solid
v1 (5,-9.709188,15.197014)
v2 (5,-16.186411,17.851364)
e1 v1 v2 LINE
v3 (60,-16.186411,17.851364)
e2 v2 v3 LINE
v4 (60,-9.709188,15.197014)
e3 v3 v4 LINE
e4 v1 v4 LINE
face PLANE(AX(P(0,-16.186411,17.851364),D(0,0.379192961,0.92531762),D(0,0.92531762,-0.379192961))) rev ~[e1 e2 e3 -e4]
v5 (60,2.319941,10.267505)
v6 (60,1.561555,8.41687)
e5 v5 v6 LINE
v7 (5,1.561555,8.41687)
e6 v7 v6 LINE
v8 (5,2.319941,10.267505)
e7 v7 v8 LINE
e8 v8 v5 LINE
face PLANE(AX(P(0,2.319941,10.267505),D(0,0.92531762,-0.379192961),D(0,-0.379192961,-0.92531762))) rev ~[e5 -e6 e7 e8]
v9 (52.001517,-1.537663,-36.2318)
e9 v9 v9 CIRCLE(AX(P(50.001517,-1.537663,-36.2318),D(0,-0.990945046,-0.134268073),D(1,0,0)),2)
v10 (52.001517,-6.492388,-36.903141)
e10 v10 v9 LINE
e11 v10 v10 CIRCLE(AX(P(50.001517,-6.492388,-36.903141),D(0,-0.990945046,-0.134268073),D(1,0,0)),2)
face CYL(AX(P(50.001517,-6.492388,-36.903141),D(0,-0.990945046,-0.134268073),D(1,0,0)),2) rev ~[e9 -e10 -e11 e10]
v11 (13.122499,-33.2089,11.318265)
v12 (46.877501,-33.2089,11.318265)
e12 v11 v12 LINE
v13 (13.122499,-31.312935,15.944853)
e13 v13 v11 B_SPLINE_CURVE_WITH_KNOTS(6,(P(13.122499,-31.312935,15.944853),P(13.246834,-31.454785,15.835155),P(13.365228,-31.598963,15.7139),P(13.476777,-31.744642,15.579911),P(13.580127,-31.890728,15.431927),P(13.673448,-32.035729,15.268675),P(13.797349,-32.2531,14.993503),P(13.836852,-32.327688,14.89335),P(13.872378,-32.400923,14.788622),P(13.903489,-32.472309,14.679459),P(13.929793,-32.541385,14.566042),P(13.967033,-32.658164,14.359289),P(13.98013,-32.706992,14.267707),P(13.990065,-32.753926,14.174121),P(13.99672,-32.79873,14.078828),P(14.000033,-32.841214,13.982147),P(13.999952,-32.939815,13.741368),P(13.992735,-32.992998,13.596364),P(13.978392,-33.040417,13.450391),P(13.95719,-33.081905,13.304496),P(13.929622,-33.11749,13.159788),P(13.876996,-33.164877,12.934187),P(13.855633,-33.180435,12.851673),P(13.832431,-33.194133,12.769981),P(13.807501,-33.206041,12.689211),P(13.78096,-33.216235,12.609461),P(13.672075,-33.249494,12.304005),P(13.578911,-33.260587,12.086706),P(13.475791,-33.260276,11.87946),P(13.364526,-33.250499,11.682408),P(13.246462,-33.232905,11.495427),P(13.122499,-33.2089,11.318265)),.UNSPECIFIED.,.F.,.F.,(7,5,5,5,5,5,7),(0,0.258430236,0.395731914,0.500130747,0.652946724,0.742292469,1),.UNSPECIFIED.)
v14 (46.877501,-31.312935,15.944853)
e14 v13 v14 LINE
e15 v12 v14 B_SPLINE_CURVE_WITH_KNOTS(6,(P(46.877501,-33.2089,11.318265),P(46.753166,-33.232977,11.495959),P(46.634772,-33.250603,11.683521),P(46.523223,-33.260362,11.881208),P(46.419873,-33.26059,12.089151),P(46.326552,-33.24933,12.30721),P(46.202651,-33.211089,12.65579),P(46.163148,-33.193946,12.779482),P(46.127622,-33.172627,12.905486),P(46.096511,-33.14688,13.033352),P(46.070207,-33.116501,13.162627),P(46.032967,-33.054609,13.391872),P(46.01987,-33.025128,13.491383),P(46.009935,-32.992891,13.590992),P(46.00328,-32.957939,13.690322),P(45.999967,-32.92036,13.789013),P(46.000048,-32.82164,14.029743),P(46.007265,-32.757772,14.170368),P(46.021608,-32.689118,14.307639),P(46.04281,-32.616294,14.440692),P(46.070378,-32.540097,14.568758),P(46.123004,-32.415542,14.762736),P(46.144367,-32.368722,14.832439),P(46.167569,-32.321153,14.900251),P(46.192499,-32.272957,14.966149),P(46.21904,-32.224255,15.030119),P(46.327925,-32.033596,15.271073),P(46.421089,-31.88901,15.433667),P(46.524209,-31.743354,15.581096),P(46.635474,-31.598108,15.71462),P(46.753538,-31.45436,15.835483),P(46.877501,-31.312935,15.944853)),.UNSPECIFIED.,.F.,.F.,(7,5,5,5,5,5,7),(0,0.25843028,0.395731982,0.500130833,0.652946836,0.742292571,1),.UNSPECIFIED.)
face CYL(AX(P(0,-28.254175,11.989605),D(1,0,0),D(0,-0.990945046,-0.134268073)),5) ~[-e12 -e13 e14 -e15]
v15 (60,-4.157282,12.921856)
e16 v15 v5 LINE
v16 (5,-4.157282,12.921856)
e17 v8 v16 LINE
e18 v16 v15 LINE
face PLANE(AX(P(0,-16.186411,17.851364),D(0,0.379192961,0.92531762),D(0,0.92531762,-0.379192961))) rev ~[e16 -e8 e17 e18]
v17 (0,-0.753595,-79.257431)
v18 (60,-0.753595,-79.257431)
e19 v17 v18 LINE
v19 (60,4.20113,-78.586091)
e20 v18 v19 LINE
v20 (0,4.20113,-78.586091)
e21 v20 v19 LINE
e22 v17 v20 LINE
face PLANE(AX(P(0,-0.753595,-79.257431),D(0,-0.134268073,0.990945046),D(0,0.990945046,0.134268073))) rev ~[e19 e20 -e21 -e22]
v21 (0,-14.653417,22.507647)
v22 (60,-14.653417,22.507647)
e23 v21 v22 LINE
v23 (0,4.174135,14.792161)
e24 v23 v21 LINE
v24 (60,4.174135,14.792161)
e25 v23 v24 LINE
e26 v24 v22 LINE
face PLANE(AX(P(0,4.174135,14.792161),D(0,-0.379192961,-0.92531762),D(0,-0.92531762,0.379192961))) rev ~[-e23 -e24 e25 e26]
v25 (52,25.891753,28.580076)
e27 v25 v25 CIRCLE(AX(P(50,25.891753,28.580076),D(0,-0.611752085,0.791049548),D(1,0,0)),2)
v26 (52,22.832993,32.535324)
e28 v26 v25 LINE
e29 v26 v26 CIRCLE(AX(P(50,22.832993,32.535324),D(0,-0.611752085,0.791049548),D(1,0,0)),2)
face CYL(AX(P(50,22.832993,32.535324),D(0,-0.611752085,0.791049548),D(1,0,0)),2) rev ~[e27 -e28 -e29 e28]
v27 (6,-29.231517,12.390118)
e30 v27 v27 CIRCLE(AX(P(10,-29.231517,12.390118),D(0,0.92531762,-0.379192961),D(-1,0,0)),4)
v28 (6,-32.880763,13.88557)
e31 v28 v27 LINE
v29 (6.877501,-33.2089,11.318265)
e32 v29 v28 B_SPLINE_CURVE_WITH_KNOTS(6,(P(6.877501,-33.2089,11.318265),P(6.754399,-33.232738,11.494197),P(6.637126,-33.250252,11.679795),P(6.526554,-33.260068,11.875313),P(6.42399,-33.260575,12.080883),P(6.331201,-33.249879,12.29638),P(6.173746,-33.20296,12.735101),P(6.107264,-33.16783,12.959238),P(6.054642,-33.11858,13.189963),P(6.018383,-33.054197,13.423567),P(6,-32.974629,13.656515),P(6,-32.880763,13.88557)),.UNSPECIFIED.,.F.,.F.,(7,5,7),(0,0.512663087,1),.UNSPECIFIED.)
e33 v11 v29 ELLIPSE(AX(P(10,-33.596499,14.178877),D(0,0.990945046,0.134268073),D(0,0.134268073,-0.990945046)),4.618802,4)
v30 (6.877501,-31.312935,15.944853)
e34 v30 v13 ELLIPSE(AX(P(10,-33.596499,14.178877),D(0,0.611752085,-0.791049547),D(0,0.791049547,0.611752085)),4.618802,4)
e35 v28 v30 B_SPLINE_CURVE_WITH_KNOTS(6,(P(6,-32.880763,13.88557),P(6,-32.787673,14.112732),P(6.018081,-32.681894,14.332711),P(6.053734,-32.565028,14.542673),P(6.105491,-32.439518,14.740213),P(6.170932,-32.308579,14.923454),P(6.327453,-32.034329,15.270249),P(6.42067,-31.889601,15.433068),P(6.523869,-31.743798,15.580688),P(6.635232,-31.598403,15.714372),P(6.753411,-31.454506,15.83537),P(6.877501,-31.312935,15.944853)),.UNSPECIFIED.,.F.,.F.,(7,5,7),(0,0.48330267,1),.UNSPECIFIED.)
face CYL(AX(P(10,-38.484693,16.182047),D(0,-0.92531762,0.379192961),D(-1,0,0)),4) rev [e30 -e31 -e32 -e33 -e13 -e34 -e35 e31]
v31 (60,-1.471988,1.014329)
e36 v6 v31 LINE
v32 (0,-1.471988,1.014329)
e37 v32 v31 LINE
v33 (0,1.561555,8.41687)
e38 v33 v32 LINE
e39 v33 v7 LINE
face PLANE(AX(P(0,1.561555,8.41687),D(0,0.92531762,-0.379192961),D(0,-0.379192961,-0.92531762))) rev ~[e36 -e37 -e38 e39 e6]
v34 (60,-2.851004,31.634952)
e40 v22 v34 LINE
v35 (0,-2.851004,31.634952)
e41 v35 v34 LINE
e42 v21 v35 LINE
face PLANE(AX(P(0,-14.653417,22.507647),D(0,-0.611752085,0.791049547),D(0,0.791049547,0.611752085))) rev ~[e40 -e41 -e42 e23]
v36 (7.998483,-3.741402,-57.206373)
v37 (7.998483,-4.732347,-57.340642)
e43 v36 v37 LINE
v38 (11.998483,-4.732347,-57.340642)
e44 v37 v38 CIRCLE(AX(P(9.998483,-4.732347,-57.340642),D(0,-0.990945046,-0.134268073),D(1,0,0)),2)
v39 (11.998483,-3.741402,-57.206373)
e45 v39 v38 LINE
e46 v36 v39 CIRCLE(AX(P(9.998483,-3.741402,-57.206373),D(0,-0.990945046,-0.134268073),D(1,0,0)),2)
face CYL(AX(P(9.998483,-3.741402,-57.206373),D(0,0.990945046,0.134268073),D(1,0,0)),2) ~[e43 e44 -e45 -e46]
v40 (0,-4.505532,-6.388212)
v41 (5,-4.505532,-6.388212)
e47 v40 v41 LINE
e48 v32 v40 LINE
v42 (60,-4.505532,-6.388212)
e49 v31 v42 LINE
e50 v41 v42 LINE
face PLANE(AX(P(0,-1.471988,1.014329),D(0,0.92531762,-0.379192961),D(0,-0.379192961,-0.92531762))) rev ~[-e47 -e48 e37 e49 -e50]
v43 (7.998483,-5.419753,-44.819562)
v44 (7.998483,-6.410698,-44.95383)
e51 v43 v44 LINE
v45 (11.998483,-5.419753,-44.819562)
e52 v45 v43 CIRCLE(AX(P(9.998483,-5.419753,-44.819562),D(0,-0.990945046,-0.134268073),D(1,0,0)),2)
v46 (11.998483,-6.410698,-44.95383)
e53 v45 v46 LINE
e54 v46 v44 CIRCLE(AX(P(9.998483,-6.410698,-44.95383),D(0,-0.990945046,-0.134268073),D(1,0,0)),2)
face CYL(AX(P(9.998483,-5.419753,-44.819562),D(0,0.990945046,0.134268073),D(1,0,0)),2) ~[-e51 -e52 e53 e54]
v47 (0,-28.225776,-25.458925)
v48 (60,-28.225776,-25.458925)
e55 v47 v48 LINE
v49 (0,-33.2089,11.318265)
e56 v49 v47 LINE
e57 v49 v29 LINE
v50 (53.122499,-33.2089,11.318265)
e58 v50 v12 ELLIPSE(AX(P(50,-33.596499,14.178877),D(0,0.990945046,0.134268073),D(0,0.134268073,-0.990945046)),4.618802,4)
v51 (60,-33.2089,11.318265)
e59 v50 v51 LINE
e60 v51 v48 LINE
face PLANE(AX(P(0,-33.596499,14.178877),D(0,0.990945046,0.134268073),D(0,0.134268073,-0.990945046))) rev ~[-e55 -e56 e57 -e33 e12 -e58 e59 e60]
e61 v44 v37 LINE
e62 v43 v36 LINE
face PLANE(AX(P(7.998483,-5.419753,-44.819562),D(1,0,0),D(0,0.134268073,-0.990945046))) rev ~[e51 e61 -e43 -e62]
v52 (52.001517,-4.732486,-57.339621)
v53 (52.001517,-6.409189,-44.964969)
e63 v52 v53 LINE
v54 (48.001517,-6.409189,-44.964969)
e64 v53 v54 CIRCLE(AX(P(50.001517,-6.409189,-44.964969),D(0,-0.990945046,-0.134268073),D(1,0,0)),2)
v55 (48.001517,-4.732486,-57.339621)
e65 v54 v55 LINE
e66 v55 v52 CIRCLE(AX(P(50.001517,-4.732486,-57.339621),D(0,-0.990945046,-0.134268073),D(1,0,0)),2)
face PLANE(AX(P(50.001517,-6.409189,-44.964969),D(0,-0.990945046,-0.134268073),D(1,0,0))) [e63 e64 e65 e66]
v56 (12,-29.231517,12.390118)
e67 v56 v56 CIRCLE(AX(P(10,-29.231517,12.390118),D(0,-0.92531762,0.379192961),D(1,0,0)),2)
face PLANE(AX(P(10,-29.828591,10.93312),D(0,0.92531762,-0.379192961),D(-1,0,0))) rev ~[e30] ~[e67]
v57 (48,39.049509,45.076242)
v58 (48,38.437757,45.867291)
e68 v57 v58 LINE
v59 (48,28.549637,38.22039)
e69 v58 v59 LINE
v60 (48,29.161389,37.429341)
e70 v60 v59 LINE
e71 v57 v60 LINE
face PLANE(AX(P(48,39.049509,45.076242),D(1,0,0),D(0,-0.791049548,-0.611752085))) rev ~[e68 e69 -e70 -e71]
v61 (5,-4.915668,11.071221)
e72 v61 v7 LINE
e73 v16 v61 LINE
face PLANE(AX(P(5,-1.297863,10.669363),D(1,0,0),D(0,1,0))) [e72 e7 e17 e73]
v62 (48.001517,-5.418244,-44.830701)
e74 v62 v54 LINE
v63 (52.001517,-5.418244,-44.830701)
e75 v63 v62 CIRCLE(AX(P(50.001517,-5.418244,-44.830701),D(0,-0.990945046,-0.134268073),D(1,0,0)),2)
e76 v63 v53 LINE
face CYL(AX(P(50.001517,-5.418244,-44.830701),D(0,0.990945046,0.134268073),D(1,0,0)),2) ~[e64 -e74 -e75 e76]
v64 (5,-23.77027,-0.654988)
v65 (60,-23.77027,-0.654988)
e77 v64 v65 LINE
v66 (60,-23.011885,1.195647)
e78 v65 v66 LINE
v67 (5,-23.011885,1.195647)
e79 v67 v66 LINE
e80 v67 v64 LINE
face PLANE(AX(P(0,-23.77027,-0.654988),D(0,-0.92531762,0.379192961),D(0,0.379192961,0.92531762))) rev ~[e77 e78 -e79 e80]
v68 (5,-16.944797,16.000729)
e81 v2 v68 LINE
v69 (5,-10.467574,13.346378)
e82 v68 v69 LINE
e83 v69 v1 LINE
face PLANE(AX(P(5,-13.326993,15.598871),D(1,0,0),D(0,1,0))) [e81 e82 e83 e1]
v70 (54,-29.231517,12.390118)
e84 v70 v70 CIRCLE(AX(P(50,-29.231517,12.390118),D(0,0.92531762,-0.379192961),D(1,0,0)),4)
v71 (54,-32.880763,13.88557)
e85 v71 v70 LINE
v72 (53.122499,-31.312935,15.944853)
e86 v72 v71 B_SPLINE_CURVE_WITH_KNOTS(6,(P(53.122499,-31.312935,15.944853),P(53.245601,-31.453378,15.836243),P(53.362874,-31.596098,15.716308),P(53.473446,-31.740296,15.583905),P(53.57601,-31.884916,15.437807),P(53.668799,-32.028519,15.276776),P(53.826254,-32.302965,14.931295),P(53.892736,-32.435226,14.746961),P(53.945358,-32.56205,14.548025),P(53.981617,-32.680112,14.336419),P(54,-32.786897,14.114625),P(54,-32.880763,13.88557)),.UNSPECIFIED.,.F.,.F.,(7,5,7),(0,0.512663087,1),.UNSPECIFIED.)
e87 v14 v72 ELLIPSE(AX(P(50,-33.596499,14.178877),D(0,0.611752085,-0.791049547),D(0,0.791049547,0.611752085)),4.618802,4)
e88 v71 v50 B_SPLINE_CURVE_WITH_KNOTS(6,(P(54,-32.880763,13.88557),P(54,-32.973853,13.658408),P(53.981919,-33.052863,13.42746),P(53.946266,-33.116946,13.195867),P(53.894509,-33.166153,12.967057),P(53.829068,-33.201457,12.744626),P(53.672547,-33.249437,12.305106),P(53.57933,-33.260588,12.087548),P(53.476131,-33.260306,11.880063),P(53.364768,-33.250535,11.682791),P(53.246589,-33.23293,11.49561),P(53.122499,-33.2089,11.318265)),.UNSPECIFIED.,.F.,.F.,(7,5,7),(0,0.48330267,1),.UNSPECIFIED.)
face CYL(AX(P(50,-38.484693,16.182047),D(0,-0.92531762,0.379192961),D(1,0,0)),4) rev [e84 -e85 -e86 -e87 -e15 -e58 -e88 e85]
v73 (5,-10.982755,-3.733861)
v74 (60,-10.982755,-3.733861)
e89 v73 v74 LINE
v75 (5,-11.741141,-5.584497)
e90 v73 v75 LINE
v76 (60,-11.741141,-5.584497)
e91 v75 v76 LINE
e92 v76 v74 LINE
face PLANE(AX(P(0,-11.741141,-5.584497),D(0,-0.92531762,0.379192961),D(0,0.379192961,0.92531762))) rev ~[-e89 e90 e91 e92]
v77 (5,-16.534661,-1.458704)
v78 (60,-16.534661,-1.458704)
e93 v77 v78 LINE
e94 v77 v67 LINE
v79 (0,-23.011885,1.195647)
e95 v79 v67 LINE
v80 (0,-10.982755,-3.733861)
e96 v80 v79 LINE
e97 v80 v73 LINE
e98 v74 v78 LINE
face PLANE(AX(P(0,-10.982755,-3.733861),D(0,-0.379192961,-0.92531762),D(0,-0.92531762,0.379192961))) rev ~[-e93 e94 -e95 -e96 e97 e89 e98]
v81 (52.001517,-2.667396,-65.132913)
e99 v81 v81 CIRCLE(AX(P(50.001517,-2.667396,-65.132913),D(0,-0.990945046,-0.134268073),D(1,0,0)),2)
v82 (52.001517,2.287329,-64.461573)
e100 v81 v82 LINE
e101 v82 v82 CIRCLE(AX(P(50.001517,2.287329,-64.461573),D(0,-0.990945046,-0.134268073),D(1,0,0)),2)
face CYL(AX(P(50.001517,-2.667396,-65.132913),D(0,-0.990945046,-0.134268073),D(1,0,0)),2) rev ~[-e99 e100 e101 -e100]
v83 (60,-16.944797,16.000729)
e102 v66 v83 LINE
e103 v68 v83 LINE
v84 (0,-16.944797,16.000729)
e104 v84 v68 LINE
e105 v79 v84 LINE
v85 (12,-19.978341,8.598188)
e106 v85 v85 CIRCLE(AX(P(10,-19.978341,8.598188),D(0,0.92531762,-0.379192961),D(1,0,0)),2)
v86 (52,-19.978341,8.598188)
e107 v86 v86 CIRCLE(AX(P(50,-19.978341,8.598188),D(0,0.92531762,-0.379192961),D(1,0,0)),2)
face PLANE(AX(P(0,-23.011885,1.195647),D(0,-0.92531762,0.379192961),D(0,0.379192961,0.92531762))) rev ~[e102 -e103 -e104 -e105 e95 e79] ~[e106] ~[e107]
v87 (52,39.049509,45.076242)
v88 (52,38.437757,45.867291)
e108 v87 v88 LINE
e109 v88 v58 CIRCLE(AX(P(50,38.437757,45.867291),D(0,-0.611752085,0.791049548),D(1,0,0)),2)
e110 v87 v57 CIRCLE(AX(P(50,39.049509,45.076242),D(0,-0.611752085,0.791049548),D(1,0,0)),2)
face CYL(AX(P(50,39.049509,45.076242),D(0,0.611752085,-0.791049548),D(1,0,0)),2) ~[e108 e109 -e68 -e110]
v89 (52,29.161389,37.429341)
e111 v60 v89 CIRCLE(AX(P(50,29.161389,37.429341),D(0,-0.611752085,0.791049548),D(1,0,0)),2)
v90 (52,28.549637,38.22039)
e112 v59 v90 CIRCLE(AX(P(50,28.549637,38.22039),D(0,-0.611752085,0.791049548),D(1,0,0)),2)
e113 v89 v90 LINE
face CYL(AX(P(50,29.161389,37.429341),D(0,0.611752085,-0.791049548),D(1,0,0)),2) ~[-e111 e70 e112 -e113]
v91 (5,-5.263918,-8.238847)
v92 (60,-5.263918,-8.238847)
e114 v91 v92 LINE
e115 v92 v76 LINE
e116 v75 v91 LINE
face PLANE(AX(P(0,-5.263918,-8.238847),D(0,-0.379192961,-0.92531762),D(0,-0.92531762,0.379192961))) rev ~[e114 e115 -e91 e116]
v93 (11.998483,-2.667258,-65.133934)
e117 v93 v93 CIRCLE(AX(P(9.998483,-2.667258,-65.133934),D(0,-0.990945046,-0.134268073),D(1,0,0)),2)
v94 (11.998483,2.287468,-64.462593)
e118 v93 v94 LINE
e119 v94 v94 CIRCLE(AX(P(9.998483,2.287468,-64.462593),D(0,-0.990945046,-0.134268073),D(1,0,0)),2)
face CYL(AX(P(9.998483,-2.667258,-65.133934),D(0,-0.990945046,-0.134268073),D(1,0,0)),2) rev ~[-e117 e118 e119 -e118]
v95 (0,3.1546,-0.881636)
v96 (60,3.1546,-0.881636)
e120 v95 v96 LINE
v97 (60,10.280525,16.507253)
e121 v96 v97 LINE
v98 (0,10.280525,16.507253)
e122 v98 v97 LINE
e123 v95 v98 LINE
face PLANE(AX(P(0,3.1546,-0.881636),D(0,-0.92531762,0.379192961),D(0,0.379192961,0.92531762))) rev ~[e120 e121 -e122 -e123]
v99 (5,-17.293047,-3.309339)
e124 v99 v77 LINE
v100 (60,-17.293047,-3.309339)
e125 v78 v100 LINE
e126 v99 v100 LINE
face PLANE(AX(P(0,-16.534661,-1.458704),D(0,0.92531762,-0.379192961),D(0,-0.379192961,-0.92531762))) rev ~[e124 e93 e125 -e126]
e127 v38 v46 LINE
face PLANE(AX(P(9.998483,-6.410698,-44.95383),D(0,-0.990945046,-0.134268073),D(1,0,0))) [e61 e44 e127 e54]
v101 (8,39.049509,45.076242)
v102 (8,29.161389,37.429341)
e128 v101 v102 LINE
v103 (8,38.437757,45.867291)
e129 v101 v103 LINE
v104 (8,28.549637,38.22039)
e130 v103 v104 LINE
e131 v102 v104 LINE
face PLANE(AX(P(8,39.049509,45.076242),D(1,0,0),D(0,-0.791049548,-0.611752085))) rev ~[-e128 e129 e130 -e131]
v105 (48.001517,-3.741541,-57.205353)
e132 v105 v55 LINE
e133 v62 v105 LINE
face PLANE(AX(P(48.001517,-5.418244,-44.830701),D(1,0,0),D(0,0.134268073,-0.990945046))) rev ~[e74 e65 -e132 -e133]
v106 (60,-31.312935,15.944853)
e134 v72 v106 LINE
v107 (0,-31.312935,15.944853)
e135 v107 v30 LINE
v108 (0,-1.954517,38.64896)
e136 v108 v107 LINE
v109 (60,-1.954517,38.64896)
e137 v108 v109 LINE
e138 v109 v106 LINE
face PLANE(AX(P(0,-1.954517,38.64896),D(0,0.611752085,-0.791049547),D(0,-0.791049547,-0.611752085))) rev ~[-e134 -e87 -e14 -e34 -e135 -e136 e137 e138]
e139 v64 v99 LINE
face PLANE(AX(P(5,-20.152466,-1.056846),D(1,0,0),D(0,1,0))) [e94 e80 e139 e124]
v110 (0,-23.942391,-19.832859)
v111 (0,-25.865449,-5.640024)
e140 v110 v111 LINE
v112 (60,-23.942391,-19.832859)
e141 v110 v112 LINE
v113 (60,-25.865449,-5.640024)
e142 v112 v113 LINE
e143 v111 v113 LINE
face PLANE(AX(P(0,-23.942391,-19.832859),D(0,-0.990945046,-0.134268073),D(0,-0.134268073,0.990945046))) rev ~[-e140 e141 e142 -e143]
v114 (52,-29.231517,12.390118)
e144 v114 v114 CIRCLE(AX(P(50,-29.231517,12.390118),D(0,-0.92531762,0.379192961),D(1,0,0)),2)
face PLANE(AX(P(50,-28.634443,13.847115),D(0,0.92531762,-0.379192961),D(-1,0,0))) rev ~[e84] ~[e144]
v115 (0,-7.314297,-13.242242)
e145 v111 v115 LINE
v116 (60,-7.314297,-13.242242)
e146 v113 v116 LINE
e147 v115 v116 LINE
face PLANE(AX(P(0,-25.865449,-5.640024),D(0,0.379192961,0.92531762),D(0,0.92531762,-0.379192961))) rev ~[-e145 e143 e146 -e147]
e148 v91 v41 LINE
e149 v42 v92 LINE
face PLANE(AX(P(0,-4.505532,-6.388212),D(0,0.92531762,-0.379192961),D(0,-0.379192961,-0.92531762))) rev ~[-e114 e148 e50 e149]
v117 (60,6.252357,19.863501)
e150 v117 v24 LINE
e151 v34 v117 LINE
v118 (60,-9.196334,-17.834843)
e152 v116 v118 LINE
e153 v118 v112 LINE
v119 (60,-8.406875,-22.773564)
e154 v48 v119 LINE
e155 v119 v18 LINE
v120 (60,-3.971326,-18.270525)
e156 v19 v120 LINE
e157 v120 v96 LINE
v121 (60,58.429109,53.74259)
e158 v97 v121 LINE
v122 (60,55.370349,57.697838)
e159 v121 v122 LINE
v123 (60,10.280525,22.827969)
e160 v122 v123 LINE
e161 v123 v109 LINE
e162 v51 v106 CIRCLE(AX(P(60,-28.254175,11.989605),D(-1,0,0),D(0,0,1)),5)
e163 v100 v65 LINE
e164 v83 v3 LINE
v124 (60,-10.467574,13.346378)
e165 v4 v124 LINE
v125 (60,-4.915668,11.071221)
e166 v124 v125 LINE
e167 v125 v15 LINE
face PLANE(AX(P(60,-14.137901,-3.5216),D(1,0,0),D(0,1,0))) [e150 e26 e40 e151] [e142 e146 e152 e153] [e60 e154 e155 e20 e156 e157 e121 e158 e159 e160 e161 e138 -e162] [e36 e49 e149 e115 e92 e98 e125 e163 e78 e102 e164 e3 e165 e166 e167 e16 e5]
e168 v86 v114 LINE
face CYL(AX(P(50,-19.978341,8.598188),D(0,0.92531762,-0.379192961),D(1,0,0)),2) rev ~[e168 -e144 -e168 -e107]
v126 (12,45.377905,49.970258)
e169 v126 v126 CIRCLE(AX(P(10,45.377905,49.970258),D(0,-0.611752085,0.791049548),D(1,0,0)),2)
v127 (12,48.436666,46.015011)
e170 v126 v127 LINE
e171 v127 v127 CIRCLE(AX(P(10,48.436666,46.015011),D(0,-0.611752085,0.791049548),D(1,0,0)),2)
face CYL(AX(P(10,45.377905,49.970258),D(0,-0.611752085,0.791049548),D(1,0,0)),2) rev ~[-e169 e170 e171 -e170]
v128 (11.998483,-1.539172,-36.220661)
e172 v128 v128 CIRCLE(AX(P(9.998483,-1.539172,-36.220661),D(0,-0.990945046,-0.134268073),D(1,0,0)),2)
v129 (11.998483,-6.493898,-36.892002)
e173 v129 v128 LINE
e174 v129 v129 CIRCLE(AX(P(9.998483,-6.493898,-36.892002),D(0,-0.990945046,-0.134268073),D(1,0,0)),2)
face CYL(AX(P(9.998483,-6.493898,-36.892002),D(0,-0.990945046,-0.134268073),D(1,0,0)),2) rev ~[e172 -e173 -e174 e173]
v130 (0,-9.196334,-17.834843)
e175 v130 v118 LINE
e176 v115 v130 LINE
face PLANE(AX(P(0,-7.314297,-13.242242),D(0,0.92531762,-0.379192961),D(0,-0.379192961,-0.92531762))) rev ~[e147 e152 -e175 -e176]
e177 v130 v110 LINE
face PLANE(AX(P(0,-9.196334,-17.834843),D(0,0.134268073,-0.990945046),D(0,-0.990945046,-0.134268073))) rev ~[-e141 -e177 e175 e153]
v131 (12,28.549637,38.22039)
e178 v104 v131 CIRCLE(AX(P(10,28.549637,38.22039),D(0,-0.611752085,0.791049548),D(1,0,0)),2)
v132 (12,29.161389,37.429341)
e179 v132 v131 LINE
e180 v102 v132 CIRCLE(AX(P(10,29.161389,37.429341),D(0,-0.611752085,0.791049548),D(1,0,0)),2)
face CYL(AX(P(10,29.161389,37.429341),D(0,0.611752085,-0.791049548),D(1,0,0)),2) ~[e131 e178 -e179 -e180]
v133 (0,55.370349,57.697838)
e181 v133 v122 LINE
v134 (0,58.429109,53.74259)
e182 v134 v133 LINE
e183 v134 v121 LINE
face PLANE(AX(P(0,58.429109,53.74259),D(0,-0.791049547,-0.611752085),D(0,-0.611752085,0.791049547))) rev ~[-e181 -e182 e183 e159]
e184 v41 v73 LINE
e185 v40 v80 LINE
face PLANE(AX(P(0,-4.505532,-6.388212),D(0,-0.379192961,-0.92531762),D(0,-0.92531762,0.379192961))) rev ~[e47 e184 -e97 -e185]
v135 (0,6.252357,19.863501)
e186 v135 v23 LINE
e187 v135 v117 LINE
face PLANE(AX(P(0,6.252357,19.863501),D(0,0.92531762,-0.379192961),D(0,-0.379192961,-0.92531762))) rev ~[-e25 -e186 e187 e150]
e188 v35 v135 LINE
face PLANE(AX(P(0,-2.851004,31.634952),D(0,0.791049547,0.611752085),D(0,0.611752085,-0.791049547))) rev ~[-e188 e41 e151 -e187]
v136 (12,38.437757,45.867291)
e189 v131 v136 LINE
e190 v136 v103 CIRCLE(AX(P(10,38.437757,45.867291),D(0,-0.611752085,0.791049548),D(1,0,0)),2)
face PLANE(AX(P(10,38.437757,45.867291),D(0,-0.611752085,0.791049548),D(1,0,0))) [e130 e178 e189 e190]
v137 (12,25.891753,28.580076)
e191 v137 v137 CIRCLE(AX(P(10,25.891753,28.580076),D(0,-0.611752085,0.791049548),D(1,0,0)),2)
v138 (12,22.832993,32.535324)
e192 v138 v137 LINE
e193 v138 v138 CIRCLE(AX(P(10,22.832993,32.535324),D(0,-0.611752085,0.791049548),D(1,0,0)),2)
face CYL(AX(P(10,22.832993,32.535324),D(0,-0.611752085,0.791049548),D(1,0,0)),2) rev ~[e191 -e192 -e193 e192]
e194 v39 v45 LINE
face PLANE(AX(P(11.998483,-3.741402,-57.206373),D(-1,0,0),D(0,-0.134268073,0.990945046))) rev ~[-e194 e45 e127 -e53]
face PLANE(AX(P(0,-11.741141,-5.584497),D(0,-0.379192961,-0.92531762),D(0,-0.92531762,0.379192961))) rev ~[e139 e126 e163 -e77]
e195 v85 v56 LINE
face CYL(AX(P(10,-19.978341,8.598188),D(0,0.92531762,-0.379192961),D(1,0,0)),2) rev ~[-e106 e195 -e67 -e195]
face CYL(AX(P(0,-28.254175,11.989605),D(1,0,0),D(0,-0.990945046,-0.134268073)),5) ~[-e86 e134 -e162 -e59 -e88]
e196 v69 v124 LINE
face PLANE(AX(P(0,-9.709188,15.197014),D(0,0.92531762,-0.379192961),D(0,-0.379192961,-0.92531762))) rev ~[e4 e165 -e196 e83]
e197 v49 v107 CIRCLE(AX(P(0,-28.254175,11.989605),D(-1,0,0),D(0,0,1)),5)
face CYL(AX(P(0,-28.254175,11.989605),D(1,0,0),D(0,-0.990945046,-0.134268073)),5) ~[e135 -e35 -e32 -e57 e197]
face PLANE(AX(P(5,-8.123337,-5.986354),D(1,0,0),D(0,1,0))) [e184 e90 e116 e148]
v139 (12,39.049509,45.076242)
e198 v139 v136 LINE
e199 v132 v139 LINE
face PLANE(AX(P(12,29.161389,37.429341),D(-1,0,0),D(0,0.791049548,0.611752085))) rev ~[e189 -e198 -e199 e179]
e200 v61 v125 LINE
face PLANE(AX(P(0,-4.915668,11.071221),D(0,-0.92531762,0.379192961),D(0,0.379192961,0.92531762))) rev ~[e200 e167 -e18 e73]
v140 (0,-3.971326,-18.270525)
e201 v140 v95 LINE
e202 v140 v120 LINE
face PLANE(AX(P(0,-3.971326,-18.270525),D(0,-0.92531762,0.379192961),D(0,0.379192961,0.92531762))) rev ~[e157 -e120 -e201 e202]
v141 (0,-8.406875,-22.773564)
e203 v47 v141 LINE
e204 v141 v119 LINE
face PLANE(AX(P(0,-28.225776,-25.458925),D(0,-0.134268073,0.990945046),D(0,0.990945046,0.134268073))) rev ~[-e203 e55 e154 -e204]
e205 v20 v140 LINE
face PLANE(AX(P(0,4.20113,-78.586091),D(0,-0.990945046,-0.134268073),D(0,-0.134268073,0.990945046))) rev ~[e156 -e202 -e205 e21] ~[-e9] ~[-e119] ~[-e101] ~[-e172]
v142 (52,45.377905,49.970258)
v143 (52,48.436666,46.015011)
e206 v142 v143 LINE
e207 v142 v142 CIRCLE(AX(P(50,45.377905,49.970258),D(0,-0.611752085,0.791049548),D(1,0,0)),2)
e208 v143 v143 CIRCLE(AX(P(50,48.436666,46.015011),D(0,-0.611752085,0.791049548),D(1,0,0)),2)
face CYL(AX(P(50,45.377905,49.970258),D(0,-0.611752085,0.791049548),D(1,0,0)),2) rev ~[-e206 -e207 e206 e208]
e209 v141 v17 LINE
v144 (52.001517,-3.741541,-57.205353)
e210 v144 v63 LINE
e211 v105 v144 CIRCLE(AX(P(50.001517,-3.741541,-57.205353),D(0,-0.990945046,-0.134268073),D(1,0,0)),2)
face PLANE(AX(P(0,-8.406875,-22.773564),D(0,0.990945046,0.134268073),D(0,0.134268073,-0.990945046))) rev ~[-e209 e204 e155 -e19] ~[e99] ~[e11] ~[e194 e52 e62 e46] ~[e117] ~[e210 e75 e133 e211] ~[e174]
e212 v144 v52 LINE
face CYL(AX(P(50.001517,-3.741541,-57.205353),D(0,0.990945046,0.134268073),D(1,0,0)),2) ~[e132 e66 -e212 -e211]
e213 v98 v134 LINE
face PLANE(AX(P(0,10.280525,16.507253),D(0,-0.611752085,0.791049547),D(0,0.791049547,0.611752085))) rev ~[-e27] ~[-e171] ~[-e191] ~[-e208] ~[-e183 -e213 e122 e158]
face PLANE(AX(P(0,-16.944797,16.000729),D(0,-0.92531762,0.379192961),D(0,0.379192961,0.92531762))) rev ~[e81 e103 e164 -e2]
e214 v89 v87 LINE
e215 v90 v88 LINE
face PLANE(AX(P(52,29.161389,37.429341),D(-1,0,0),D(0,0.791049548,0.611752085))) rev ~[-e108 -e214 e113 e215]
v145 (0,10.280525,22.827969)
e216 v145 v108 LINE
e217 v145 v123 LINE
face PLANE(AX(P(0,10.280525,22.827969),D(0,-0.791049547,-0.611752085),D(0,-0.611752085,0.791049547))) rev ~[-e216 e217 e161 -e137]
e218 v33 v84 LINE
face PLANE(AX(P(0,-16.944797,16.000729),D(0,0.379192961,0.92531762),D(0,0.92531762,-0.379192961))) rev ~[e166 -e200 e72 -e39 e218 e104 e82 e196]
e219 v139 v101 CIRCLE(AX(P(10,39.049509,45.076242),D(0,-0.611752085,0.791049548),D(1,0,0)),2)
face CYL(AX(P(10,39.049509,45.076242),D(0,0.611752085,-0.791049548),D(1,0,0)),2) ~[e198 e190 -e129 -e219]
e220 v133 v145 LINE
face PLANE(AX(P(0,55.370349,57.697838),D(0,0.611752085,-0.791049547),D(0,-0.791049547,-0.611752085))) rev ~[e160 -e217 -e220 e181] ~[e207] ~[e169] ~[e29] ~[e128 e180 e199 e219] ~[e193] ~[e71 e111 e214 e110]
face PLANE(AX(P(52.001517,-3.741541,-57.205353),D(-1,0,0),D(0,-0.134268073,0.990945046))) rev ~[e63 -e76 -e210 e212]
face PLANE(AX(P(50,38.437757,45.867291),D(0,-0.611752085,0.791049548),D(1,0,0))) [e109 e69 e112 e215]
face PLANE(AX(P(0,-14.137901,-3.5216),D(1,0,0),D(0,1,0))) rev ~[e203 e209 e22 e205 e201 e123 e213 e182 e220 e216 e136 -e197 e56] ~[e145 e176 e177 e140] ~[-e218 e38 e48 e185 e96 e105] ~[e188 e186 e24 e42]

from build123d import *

# Parameters (mm, degrees)
F1_DEPTH  = 60
F2_DEPTH  = 5
F3_DEPTH  = 60
F4_R      = 5
F7_DEPTH  = 5
F8_DEPTH  = 5
F9_DEPTH  = 1
F10_DEPTH = 1
F12_DEPTH = 25
F13_DEPTH = 20
F14_DEPTH = 10


with BuildPart() as f1:
    # F0 (on Right) → F1 (new body)
    with BuildSketch(Plane.YZ):
        Polygon((-1.9545168432, 38.6489601963), (-33.5964987424, 14.1788767986), (-28.2257758369, -25.4589250511), (-8.406874912, -22.7735635983), (-0.7535947717, -79.2574312341), (4.2011304595, -78.5860908709), (-3.9713255886, -18.2705245759), (3.1545996335, -0.8816359607), (10.2805248557, 16.5072526545), (58.4291094867, 53.742590351), (55.370349062, 57.6978380884), (10.2805248557, 22.8279692467), align=None)
        Polygon((-25.8654488138, -5.6400241263), (-7.3142972833, -13.2422419285), (-9.1963342424, -17.8348428934), (-23.9423909688, -19.8328594567), align=None, mode=Mode.SUBTRACT)
        Polygon((1.5615552233, 8.4168698067), (-1.4719884671, 1.0143288458), (-4.5055321574, -6.3882121151), (-5.26391808, -8.2388473554), (-11.7411414209, -5.5844966263), (-17.2930471416, -3.3093388585), (-23.7702704824, -0.6549881294), (-23.0118845598, 1.1956471108), (-16.944797179, 16.0007290327), (-16.1864112564, 17.851364273), (-9.7091879156, 15.1970135439), (-4.1572821949, 12.9218557761), (2.3199411459, 10.267505047), align=None, mode=Mode.SUBTRACT)
        Polygon((-14.6534166938, 22.50764705), (-2.8510041559, 31.6349520341), (6.2523573083, 19.863500585), (4.1741345282, 14.7921613112), align=None, mode=Mode.SUBTRACT)
    extrude(amount=F1_DEPTH)

    # F0 (on Right) → F2 (join)
    with BuildSketch(Plane.YZ):
        Polygon((-16.944797179, 16.0007290327), (-10.4675738382, 13.3463783036), (-9.7091879156, 15.1970135439), (-16.1864112564, 17.851364273), align=None)
        Polygon((-4.9156681175, 11.0712205358), (1.5615552233, 8.4168698067), (2.3199411459, 10.267505047), (-4.1572821949, 12.9218557761), align=None)
        Polygon((-5.26391808, -8.2388473554), (-4.5055321574, -6.3882121151), (-10.9827554983, -3.7338613861), (-11.7411414209, -5.5844966263), align=None)
        Polygon((-17.2930471416, -3.3093388585), (-16.534661219, -1.4587036183), (-23.0118845598, 1.1956471108), (-23.7702704824, -0.6549881294), align=None)
    extrude(amount=F2_DEPTH)

    # F0 (on Right) → F3 (join)
    with BuildSketch(Plane.YZ):
        Polygon((-11.7411414209, -5.5844966263), (-10.9827554983, -3.7338613861), (-16.534661219, -1.4587036183), (-17.2930471416, -3.3093388585), align=None)
        Polygon((-10.4675738382, 13.3463783036), (-4.9156681175, 11.0712205358), (-4.1572821949, 12.9218557761), (-9.7091879156, 15.1970135439), align=None)
    extrude(amount=F3_DEPTH)

    # F4
    f4_edges = [f1.edges().sort_by_distance(p)[0] for p in [
        (30, -33.596499, 14.178877),
    ]]
    fillet(f4_edges, radius=F4_R)

    # F6 (on face) → F7 (cut)
    with BuildSketch(Plane(origin=(0, -11.2853910764, -1.5291137632), x_dir=(1, 0, 0), z_dir=(0, -0.9909450462, -0.1342680726))):
        with BuildLine():
            ThreePointArc((7.9984828914, -64.1860215089), (9.9984828914, -66.1860215089), (11.9984828914, -64.1860215089))
            ThreePointArc((11.9984828914, -64.1860215089), (9.9984828914, -62.1860215089), (7.9984828914, -64.1860215089))
        make_face()
        with BuildLine():
            ThreePointArc((7.9984828914, -35.6860233554), (9.9984828914, -37.6860233554), (11.9984828914, -35.6860233554))
            ThreePointArc((11.9984828914, -35.6860233554), (9.9984828914, -33.6860233554), (7.9984828914, -35.6860233554))
        make_face()
        with BuildLine():
            ThreePointArc((48.0015171086, -35.6972638628), (50.0015171086, -37.6972638628), (52.0015171086, -35.6972638628))
            ThreePointArc((52.0015171086, -35.6972638628), (50.0015171086, -33.6972638628), (48.0015171086, -35.6972638628))
        make_face()
        with BuildLine():
            ThreePointArc((48.0015171086, -64.1849918396), (50.0015171086, -66.1849918396), (52.0015171086, -64.1849918396))
            ThreePointArc((52.0015171086, -64.1849918396), (50.0015171086, -62.1849918396), (48.0015171086, -64.1849918396))
        make_face()
    extrude(amount=-F7_DEPTH, mode=Mode.SUBTRACT)

    # F5 (on face) → F8 (cut)
    with BuildSketch(Plane(origin=(0, -7.1996627103, 9.3098006026), x_dir=(1, 0, 0), z_dir=(0, -0.6117520849, 0.7910495475))):
        with BuildLine():
            ThreePointArc((48, 66.4655810893), (50, 64.4655810893), (52, 66.4655810893))
            ThreePointArc((52, 66.4655810893), (50, 68.4655810893), (48, 66.4655810893))
        make_face()
        with BuildLine():
            ThreePointArc((48, 37.9655810893), (50, 35.9655810893), (52, 37.9655810893))
            ThreePointArc((52, 37.9655810893), (50, 39.9655810893), (48, 37.9655810893))
        make_face()
        with BuildLine():
            ThreePointArc((8, 37.9655810893), (10, 35.9655810893), (12, 37.9655810893))
            ThreePointArc((12, 37.9655810893), (10, 39.9655810893), (8, 37.9655810893))
        make_face()
        with BuildLine():
            ThreePointArc((8, 66.4655810893), (10, 64.4655810893), (12, 66.4655810893))
            ThreePointArc((12, 66.4655810893), (10, 68.4655810893), (8, 66.4655810893))
        make_face()
    extrude(amount=-F8_DEPTH, mode=Mode.SUBTRACT)

    # F5 (on face) → F9 (join)
    with BuildSketch(Plane(origin=(0, -7.1996627103, 9.3098006026), x_dir=(1, 0, 0), z_dir=(0, -0.6117520849, 0.7910495475))):
        with BuildLine():
            ThreePointArc((48, 58.4655810893), (50, 56.4655810893), (52, 58.4655810893))
            ThreePointArc((52, 58.4655810893), (50, 60.4655810893), (48, 58.4655810893))
        make_face()
        with BuildLine():
            Line((52, 45.9655810893), (52, 58.4655810893))
            ThreePointArc((52, 58.4655810893), (50, 56.4655810893), (48, 58.4655810893))
            Line((48, 58.4655810893), (48, 45.9655810893))
            ThreePointArc((48, 45.9655810893), (50, 47.9655810893), (52, 45.9655810893))
        make_face()
        with BuildLine():
            ThreePointArc((48, 45.9655810893), (50, 43.9655810893), (52, 45.9655810893))
            ThreePointArc((52, 45.9655810893), (50, 47.9655810893), (48, 45.9655810893))
        make_face()
        with BuildLine():
            ThreePointArc((8, 58.4655810893), (10, 56.4655810893), (12, 58.4655810893))
            ThreePointArc((12, 58.4655810893), (10, 60.4655810893), (8, 58.4655810893))
        make_face()
        with BuildLine():
            ThreePointArc((8, 45.9655810893), (10, 47.9655810893), (12, 45.9655810893))
            Line((12, 45.9655810893), (12, 58.4655810893))
            ThreePointArc((12, 58.4655810893), (10, 56.4655810893), (8, 58.4655810893))
            Line((8, 58.4655810893), (8, 45.9655810893))
        make_face()
        with BuildLine():
            ThreePointArc((8, 45.9655810893), (10, 43.9655810893), (12, 45.9655810893))
            ThreePointArc((12, 45.9655810893), (10, 47.9655810893), (8, 45.9655810893))
        make_face()
    extrude(amount=F9_DEPTH)

    # F6 (on face) → F10 (join)
    with BuildSketch(Plane(origin=(0, -11.2853910764, -1.5291137632), x_dir=(1, 0, 0), z_dir=(0, -0.9909450462, -0.1342680726))):
        with BuildLine():
            ThreePointArc((48.0015171086, -43.6972638628), (50.0015171086, -45.6972638628), (52.0015171086, -43.6972638628))
            ThreePointArc((52.0015171086, -43.6972638628), (50.0015171086, -41.6972638628), (48.0015171086, -43.6972638628))
        make_face()
        with BuildLine():
            Line((52.0015171086, -56.1849918396), (52.0015171086, -43.6972638628))
            ThreePointArc((52.0015171086, -43.6972638628), (50.0015171086, -45.6972638628), (48.0015171086, -43.6972638628))
            Line((48.0015171086, -43.6972638628), (48.0015171086, -56.1849918396))
            ThreePointArc((48.0015171086, -56.1849918396), (50.0015171086, -54.1849918396), (52.0015171086, -56.1849918396))
        make_face()
        with BuildLine():
            ThreePointArc((48.0015171086, -56.1849918396), (50.0015171086, -58.1849918396), (52.0015171086, -56.1849918396))
            ThreePointArc((52.0015171086, -56.1849918396), (50.0015171086, -54.1849918396), (48.0015171086, -56.1849918396))
        make_face()
        with BuildLine():
            ThreePointArc((7.9984828914, -43.6860233554), (9.9984828914, -45.6860233554), (11.9984828914, -43.6860233554))
            ThreePointArc((11.9984828914, -43.6860233554), (9.9984828914, -41.6860233554), (7.9984828914, -43.6860233554))
        make_face()
        with BuildLine():
            ThreePointArc((7.9984828914, -56.1860215089), (9.9984828914, -54.1860215089), (11.9984828914, -56.1860215089))
            Line((11.9984828914, -56.1860215089), (11.9984828914, -43.6860233554))
            ThreePointArc((11.9984828914, -43.6860233554), (9.9984828914, -45.6860233554), (7.9984828914, -43.6860233554))
            Line((7.9984828914, -43.6860233554), (7.9984828914, -56.1860215089))
        make_face()
        with BuildLine():
            ThreePointArc((7.9984828914, -56.1860215089), (9.9984828914, -58.1860215089), (11.9984828914, -56.1860215089))
            ThreePointArc((11.9984828914, -56.1860215089), (9.9984828914, -54.1860215089), (7.9984828914, -56.1860215089))
        make_face()
    extrude(amount=F10_DEPTH)

    # F11 (on face) → F12 (cut)
    with BuildSketch(Plane(origin=(0, -20.1225891662, 8.2461892101), x_dir=(-1, 0, 0), z_dir=(0, 0.9253176201, -0.3791929613))):
        with BuildLine():
            Line((-12, 0.3804086878), (-8, 0.3804086878))
            ThreePointArc((-8, 0.3804086878), (-10, 2.3804086878), (-12, 0.3804086878))
        make_face()
        with BuildLine():
            Line((-52, 0.3804086878), (-48, 0.3804086878))
            ThreePointArc((-48, 0.3804086878), (-50, 2.3804086878), (-52, 0.3804086878))
        make_face()
        with BuildLine():
            ThreePointArc((-52, 0.3804086878), (-50, -1.6195913122), (-48, 0.3804086878))
            Line((-48, 0.3804086878), (-52, 0.3804086878))
        make_face()
        with BuildLine():
            ThreePointArc((-12, 0.3804086878), (-10, -1.6195913122), (-8, 0.3804086878))
            Line((-8, 0.3804086878), (-12, 0.3804086878))
        make_face()
    extrude(amount=-F12_DEPTH, mode=Mode.SUBTRACT)

    # F11 (on face) → F13 (join)
    with BuildSketch(Plane(origin=(0, -20.1225891662, 8.2461892101), x_dir=(-1, 0, 0), z_dir=(0, 0.9253176201, -0.3791929613))):
        with BuildLine():
            Line((-48, 0.3804086878), (-46, 0.3804086878))
            ThreePointArc((-46, 0.3804086878), (-50, 4.3804086878), (-54, 0.3804086878))
            Line((-54, 0.3804086878), (-52, 0.3804086878))
            ThreePointArc((-52, 0.3804086878), (-50, 2.3804086878), (-48, 0.3804086878))
        make_face()
        with BuildLine():
            ThreePointArc((-54, 0.3804086878), (-50, -3.6195913122), (-46, 0.3804086878))
            Line((-46, 0.3804086878), (-48, 0.3804086878))
            ThreePointArc((-48, 0.3804086878), (-50, -1.6195913122), (-52, 0.3804086878))
            Line((-52, 0.3804086878), (-54, 0.3804086878))
        make_face()
        with BuildLine():
            ThreePointArc((-14, 0.3804086878), (-10, -3.6195913122), (-6, 0.3804086878))
            Line((-6, 0.3804086878), (-8, 0.3804086878))
            ThreePointArc((-8, 0.3804086878), (-10, -1.6195913122), (-12, 0.3804086878))
            Line((-12, 0.3804086878), (-14, 0.3804086878))
        make_face()
        with BuildLine():
            Line((-8, 0.3804086878), (-6, 0.3804086878))
            ThreePointArc((-6, 0.3804086878), (-10, 4.3804086878), (-14, 0.3804086878))
            Line((-14, 0.3804086878), (-12, 0.3804086878))
            ThreePointArc((-12, 0.3804086878), (-10, 2.3804086878), (-8, 0.3804086878))
        make_face()
    extrude(amount=-F13_DEPTH)

    # F14 (cut): faces of the model
    f14_faces = [f1.faces().sort_by_distance(p)[0] for p in [
        (7.886862915, -38.4846932718, 16.1820472977),
        (46.113137085, -38.4846932718, 16.1820472977),
    ]]
    extrude(f14_faces, amount=-F14_DEPTH, mode=Mode.SUBTRACT)


solid = f1.part
